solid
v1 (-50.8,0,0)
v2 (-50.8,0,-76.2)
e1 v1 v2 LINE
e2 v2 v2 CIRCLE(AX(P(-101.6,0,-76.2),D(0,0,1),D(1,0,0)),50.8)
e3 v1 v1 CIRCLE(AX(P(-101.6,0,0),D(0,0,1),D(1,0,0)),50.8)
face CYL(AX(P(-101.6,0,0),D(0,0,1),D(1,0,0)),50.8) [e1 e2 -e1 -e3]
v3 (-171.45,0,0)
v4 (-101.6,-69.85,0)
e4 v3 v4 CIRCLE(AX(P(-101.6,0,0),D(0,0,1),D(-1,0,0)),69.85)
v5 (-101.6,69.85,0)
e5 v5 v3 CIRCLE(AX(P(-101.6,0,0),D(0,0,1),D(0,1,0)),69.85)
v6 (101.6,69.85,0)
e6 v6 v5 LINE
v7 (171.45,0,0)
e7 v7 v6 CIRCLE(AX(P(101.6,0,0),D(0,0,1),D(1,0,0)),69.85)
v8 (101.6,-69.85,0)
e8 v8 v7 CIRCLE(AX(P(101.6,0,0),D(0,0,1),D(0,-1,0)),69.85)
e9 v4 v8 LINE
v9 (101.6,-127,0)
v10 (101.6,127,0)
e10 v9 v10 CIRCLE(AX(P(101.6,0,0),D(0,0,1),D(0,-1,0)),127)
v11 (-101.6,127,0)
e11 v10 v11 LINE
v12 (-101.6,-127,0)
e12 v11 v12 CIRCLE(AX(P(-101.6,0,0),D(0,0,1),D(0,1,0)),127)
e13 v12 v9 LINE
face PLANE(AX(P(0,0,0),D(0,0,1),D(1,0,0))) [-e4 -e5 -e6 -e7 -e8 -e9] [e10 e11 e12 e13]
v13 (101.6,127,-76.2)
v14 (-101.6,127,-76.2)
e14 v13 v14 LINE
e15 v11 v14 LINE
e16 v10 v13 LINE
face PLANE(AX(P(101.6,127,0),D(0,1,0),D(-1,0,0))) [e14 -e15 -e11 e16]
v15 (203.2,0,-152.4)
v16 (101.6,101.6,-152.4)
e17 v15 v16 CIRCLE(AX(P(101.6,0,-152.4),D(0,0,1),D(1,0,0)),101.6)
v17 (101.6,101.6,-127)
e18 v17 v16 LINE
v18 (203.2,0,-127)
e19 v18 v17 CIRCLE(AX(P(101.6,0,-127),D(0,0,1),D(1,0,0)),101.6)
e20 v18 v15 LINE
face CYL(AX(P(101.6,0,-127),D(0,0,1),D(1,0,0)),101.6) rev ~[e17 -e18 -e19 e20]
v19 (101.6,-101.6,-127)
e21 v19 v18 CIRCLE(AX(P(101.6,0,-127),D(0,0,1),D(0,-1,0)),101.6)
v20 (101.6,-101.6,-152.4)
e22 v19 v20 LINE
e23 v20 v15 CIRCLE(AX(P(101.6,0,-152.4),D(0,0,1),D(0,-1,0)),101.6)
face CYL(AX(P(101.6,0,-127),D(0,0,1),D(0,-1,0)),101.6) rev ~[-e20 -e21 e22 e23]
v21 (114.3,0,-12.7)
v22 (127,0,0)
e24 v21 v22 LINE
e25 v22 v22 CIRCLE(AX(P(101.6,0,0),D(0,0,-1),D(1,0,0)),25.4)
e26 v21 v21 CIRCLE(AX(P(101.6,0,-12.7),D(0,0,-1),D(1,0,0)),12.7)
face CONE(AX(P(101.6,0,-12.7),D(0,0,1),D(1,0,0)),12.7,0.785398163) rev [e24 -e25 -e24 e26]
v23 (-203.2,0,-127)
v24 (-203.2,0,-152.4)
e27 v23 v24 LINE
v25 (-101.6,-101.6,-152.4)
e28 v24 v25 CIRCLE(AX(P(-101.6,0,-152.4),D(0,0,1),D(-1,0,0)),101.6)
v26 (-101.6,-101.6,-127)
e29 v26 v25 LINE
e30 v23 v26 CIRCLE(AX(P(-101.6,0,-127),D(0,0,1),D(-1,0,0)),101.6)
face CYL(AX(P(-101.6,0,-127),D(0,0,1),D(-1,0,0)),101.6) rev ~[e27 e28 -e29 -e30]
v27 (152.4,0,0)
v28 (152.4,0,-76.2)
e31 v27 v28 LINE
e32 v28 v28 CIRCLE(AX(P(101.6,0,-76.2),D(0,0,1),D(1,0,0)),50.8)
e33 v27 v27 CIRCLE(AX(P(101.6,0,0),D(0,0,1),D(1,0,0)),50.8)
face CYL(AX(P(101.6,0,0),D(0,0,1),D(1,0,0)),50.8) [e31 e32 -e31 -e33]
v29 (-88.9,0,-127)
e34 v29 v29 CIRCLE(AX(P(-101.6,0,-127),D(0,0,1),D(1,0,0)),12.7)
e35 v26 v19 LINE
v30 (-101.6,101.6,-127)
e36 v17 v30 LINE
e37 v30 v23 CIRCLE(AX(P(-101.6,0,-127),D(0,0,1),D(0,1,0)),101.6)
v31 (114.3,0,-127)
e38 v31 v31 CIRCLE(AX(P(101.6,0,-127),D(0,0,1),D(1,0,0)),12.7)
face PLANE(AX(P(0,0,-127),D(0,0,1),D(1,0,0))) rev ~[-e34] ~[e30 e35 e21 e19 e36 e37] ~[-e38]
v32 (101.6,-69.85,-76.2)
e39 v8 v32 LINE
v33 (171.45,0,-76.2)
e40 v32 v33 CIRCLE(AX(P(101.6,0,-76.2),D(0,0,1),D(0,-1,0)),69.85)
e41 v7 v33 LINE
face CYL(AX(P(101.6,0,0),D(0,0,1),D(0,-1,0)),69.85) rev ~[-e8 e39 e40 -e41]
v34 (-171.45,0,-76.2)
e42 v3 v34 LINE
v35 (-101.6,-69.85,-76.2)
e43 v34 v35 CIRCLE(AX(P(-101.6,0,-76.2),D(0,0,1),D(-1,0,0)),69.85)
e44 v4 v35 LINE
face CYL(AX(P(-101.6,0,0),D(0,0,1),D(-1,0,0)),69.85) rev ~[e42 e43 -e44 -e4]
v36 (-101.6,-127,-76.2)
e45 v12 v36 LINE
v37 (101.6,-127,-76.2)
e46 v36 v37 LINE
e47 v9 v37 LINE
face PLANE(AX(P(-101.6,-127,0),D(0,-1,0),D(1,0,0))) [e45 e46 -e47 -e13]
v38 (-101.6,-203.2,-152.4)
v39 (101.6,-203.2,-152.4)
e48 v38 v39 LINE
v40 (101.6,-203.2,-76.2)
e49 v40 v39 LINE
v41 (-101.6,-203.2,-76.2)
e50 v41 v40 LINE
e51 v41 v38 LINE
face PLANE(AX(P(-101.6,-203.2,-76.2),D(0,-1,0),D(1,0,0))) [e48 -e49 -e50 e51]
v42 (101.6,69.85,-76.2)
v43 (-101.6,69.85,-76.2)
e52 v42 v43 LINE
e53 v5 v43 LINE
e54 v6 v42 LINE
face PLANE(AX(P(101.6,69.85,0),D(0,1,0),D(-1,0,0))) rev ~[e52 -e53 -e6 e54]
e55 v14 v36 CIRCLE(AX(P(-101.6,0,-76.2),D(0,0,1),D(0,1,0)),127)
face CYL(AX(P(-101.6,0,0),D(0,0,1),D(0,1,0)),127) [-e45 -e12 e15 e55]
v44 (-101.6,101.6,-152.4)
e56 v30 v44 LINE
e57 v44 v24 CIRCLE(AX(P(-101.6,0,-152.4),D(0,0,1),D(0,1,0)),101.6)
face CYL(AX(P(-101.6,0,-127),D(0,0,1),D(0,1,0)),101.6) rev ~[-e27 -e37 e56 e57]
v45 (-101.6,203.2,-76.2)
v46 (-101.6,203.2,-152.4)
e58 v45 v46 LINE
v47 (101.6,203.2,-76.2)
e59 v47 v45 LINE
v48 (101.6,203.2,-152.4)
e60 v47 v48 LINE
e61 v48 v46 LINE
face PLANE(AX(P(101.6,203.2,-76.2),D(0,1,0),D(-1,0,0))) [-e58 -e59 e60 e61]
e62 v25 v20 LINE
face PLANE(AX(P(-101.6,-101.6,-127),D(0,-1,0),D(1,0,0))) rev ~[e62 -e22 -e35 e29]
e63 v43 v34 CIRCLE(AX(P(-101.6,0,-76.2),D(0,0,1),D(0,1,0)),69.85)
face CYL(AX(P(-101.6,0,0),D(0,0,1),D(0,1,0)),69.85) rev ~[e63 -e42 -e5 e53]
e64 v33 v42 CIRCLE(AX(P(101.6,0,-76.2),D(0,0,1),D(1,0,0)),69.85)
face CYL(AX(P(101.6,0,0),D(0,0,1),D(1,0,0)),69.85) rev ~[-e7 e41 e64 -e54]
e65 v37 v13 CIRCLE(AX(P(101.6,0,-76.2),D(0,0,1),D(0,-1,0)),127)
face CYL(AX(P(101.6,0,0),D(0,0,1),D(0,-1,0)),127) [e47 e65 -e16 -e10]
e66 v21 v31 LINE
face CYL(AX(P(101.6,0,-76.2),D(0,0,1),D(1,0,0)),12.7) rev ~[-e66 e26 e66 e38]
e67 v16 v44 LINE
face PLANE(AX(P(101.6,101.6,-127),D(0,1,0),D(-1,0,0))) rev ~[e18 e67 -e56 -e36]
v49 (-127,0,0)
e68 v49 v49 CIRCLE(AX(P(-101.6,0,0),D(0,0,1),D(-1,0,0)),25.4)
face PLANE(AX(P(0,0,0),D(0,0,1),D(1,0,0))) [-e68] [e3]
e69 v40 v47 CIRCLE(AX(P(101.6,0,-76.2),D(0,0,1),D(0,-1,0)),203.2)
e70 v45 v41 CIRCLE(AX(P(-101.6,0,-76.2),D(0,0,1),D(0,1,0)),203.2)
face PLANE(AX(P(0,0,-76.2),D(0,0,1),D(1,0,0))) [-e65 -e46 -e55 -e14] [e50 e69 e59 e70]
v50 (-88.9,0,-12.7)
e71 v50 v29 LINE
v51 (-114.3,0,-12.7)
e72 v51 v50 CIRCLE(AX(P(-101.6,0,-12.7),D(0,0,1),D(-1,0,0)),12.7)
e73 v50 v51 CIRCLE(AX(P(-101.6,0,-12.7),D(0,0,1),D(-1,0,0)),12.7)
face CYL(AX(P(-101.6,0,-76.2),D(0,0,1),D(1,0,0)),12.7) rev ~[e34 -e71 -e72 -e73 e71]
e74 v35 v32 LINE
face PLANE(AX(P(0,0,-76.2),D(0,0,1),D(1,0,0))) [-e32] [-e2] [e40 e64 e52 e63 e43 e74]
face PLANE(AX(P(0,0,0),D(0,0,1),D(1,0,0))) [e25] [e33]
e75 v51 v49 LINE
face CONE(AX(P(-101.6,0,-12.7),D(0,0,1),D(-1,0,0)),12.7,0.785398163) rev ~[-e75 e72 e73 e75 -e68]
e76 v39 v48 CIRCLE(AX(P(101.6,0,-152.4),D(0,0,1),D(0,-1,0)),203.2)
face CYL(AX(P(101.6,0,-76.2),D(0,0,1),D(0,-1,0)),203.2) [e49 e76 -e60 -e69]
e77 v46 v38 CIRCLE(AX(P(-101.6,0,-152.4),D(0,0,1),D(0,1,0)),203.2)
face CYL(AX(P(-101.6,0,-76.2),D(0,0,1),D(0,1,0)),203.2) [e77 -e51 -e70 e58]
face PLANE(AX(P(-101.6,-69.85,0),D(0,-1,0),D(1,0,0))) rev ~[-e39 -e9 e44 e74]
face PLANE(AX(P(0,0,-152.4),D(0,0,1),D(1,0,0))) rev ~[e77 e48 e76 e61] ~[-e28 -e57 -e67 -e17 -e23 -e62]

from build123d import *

# Parameters (mm, degrees)
F0_R     = 50.8
F0_R_2   = 25.4
F0_R_3   = 12.7
F1_DEPTH = 76.2
F2_START = -76.2
F2_DEPTH = 76.2
F3_START = -127
F3_DEPTH = 25.4
F4_DEPTH = 76.2


# Not quite as in the source:
# - a pattern or mirror of a feature is missing from the dataset's text; its kind, count and spacing are read off the source's solid


with BuildPart() as f1:
    # F0 (on Top) → F1 (new body)
    with BuildSketch(Plane.XY):
        with BuildLine():
            Line((-101.6, -127), (101.6, -127))
            ThreePointArc((101.6, -127), (191.4025612107, -89.8025612107), (228.6, 0))
            ThreePointArc((228.6, 0), (191.4025612107, 89.8025612107), (101.6, 127))
            Line((101.6, 127), (-101.6, 127))
            ThreePointArc((-101.6, 127), (-191.4025612107, 89.8025612107), (-228.6, 0))
            ThreePointArc((-228.6, 0), (-191.4025612107, -89.8025612107), (-101.6, -127))
        make_face()
        with BuildLine():
            ThreePointArc((203.2, 0), (173.4420489686, -71.8420489686), (101.6, -101.6))
            Line((101.6, -101.6), (-101.6, -101.6))
            ThreePointArc((-101.6, -101.6), (-173.4420489686, -71.8420489686), (-203.2, 0))
            ThreePointArc((-203.2, 0), (-173.4420489686, 71.8420489686), (-101.6, 101.6))
            Line((-101.6, 101.6), (101.6, 101.6))
            ThreePointArc((101.6, 101.6), (173.4420489686, 71.8420489686), (203.2, 0))
        make_face(mode=Mode.SUBTRACT)
        with BuildLine():
            Line((-101.6, -101.6), (101.6, -101.6))
            ThreePointArc((101.6, -101.6), (173.4420489686, -71.8420489686), (203.2, 0))
            ThreePointArc((203.2, 0), (173.4420489686, 71.8420489686), (101.6, 101.6))
            Line((101.6, 101.6), (-101.6, 101.6))
            ThreePointArc((-101.6, 101.6), (-173.4420489686, 71.8420489686), (-203.2, 0))
            ThreePointArc((-203.2, 0), (-173.4420489686, -71.8420489686), (-101.6, -101.6))
        make_face()
        with BuildLine():
            Line((-101.6, 69.85), (101.6, 69.85))
            ThreePointArc((101.6, 69.85), (150.9914086659, 49.3914086659), (171.45, 0))
            ThreePointArc((171.45, 0), (150.9914086659, -49.3914086659), (101.6, -69.85))
            Line((101.6, -69.85), (-101.6, -69.85))
            ThreePointArc((-101.6, -69.85), (-150.9914086659, -49.3914086659), (-171.45, 0))
            ThreePointArc((-171.45, 0), (-150.9914086659, 49.3914086659), (-101.6, 69.85))
        make_face(mode=Mode.SUBTRACT)
        with BuildLine():
            ThreePointArc((171.45, 0), (150.9914086659, 49.3914086659), (101.6, 69.85))
            Line((101.6, 69.85), (-101.6, 69.85))
            ThreePointArc((-101.6, 69.85), (-150.9914086659, 49.3914086659), (-171.45, 0))
            ThreePointArc((-171.45, 0), (-150.9914086659, -49.3914086659), (-101.6, -69.85))
            Line((-101.6, -69.85), (101.6, -69.85))
            ThreePointArc((101.6, -69.85), (150.9914086659, -49.3914086659), (171.45, 0))
        make_face()
        with Locations((-101.6, 0)):
            Circle(F0_R, mode=Mode.SUBTRACT)
        with Locations((101.6, 0)):
            Circle(F0_R, mode=Mode.SUBTRACT)
        with Locations((-101.6, 0)):
            Circle(F0_R)
        with Locations((-101.6, 0)):
            Circle(F0_R_2, mode=Mode.SUBTRACT)
        with Locations((101.6, 0)):
            Circle(F0_R)
        with Locations((101.6, 0)):
            Circle(F0_R_2, mode=Mode.SUBTRACT)
        with Locations((-101.6, 0)):
            Circle(F0_R_2)
        with Locations((-101.6, 0)):
            Circle(F0_R_3, mode=Mode.SUBTRACT)
        with Locations((101.6, 0)):
            Circle(F0_R_2)
        with Locations((101.6, 0)):
            Circle(F0_R_3, mode=Mode.SUBTRACT)
    extrude(amount=-F1_DEPTH)

    # F0 (on Top) → F2 (join)
    with BuildSketch(Plane.XY.offset(F2_START)):
        with BuildLine():
            Line((-101.6, -203.2), (101.6, -203.2))
            ThreePointArc((101.6, -203.2), (245.2840979371, -143.6840979371), (304.8, 0))
            ThreePointArc((304.8, 0), (245.2840979371, 143.6840979371), (101.6, 203.2))
            Line((101.6, 203.2), (-101.6, 203.2))
            ThreePointArc((-101.6, 203.2), (-245.2840979371, 143.6840979371), (-304.8, 0))
            ThreePointArc((-304.8, 0), (-245.2840979371, -143.6840979371), (-101.6, -203.2))
        make_face()
        with BuildLine():
            ThreePointArc((228.6, 0), (191.4025612107, -89.8025612107), (101.6, -127))
            Line((101.6, -127), (-101.6, -127))
            ThreePointArc((-101.6, -127), (-191.4025612107, -89.8025612107), (-228.6, 0))
            ThreePointArc((-228.6, 0), (-191.4025612107, 89.8025612107), (-101.6, 127))
            Line((-101.6, 127), (101.6, 127))
            ThreePointArc((101.6, 127), (191.4025612107, 89.8025612107), (228.6, 0))
        make_face(mode=Mode.SUBTRACT)
        with BuildLine():
            Line((-101.6, -127), (101.6, -127))
            ThreePointArc((101.6, -127), (191.4025612107, -89.8025612107), (228.6, 0))
            ThreePointArc((228.6, 0), (191.4025612107, 89.8025612107), (101.6, 127))
            Line((101.6, 127), (-101.6, 127))
            ThreePointArc((-101.6, 127), (-191.4025612107, 89.8025612107), (-228.6, 0))
            ThreePointArc((-228.6, 0), (-191.4025612107, -89.8025612107), (-101.6, -127))
        make_face()
        with BuildLine():
            ThreePointArc((203.2, 0), (173.4420489686, -71.8420489686), (101.6, -101.6))
            Line((101.6, -101.6), (-101.6, -101.6))
            ThreePointArc((-101.6, -101.6), (-173.4420489686, -71.8420489686), (-203.2, 0))
            ThreePointArc((-203.2, 0), (-173.4420489686, 71.8420489686), (-101.6, 101.6))
            Line((-101.6, 101.6), (101.6, 101.6))
            ThreePointArc((101.6, 101.6), (173.4420489686, 71.8420489686), (203.2, 0))
        make_face(mode=Mode.SUBTRACT)
        with BuildLine():
            Line((-101.6, -101.6), (101.6, -101.6))
            ThreePointArc((101.6, -101.6), (173.4420489686, -71.8420489686), (203.2, 0))
            ThreePointArc((203.2, 0), (173.4420489686, 71.8420489686), (101.6, 101.6))
            Line((101.6, 101.6), (-101.6, 101.6))
            ThreePointArc((-101.6, 101.6), (-173.4420489686, 71.8420489686), (-203.2, 0))
            ThreePointArc((-203.2, 0), (-173.4420489686, -71.8420489686), (-101.6, -101.6))
        make_face()
        with BuildLine():
            Line((-101.6, 69.85), (101.6, 69.85))
            ThreePointArc((101.6, 69.85), (150.9914086659, 49.3914086659), (171.45, 0))
            ThreePointArc((171.45, 0), (150.9914086659, -49.3914086659), (101.6, -69.85))
            Line((101.6, -69.85), (-101.6, -69.85))
            ThreePointArc((-101.6, -69.85), (-150.9914086659, -49.3914086659), (-171.45, 0))
            ThreePointArc((-171.45, 0), (-150.9914086659, 49.3914086659), (-101.6, 69.85))
        make_face(mode=Mode.SUBTRACT)
        with BuildLine():
            ThreePointArc((171.45, 0), (150.9914086659, 49.3914086659), (101.6, 69.85))
            Line((101.6, 69.85), (-101.6, 69.85))
            ThreePointArc((-101.6, 69.85), (-150.9914086659, 49.3914086659), (-171.45, 0))
            ThreePointArc((-171.45, 0), (-150.9914086659, -49.3914086659), (-101.6, -69.85))
            Line((-101.6, -69.85), (101.6, -69.85))
            ThreePointArc((101.6, -69.85), (150.9914086659, -49.3914086659), (171.45, 0))
        make_face()
        with Locations((-101.6, 0)):
            Circle(F0_R, mode=Mode.SUBTRACT)
        with Locations((101.6, 0)):
            Circle(F0_R, mode=Mode.SUBTRACT)
        with Locations((-101.6, 0)):
            Circle(F0_R)
        with Locations((-101.6, 0)):
            Circle(F0_R_2, mode=Mode.SUBTRACT)
        with Locations((-101.6, 0)):
            Circle(F0_R_2)
        with Locations((-101.6, 0)):
            Circle(F0_R_3, mode=Mode.SUBTRACT)
        with Locations((101.6, 0)):
            Circle(F0_R)
        with Locations((101.6, 0)):
            Circle(F0_R_2, mode=Mode.SUBTRACT)
        with Locations((101.6, 0)):
            Circle(F0_R_2)
        with Locations((101.6, 0)):
            Circle(F0_R_3, mode=Mode.SUBTRACT)
    extrude(amount=-F2_DEPTH)

    # F0 (on Top) → F3 (cut)
    with BuildSketch(Plane.XY.offset(F3_START)):
        with BuildLine():
            Line((-101.6, -101.6), (101.6, -101.6))
            ThreePointArc((101.6, -101.6), (173.4420489686, -71.8420489686), (203.2, 0))
            ThreePointArc((203.2, 0), (173.4420489686, 71.8420489686), (101.6, 101.6))
            Line((101.6, 101.6), (-101.6, 101.6))
            ThreePointArc((-101.6, 101.6), (-173.4420489686, 71.8420489686), (-203.2, 0))
            ThreePointArc((-203.2, 0), (-173.4420489686, -71.8420489686), (-101.6, -101.6))
        make_face()
        with BuildLine():
            Line((-101.6, 69.85), (101.6, 69.85))
            ThreePointArc((101.6, 69.85), (150.9914086659, 49.3914086659), (171.45, 0))
            ThreePointArc((171.45, 0), (150.9914086659, -49.3914086659), (101.6, -69.85))
            Line((101.6, -69.85), (-101.6, -69.85))
            ThreePointArc((-101.6, -69.85), (-150.9914086659, -49.3914086659), (-171.45, 0))
            ThreePointArc((-171.45, 0), (-150.9914086659, 49.3914086659), (-101.6, 69.85))
        make_face(mode=Mode.SUBTRACT)
        with BuildLine():
            ThreePointArc((171.45, 0), (150.9914086659, 49.3914086659), (101.6, 69.85))
            Line((101.6, 69.85), (-101.6, 69.85))
            ThreePointArc((-101.6, 69.85), (-150.9914086659, 49.3914086659), (-171.45, 0))
            ThreePointArc((-171.45, 0), (-150.9914086659, -49.3914086659), (-101.6, -69.85))
            Line((-101.6, -69.85), (101.6, -69.85))
            ThreePointArc((101.6, -69.85), (150.9914086659, -49.3914086659), (171.45, 0))
        make_face()
        with Locations((-101.6, 0)):
            Circle(F0_R, mode=Mode.SUBTRACT)
        with Locations((101.6, 0)):
            Circle(F0_R, mode=Mode.SUBTRACT)
        with Locations((101.6, 0)):
            Circle(F0_R)
        with Locations((101.6, 0)):
            Circle(F0_R_2, mode=Mode.SUBTRACT)
        with Locations((101.6, 0)):
            Circle(F0_R_2)
        with Locations((101.6, 0)):
            Circle(F0_R_3, mode=Mode.SUBTRACT)
        with Locations((-101.6, 0)):
            Circle(F0_R)
        with Locations((-101.6, 0)):
            Circle(F0_R_2, mode=Mode.SUBTRACT)
        with Locations((-101.6, 0)):
            Circle(F0_R_2)
        with Locations((-101.6, 0)):
            Circle(F0_R_3, mode=Mode.SUBTRACT)
        with Locations((-101.6, 0)):
            Circle(F0_R_3)
        with Locations((101.6, 0)):
            Circle(F0_R_3)
    extrude(amount=-F3_DEPTH, mode=Mode.SUBTRACT)

    # F0 (on Top) → F4 (cut)
    with BuildSketch(Plane.XY):
        with BuildLine():
            ThreePointArc((171.45, 0), (150.9914086659, 49.3914086659), (101.6, 69.85))
            Line((101.6, 69.85), (-101.6, 69.85))
            ThreePointArc((-101.6, 69.85), (-150.9914086659, 49.3914086659), (-171.45, 0))
            ThreePointArc((-171.45, 0), (-150.9914086659, -49.3914086659), (-101.6, -69.85))
            Line((-101.6, -69.85), (101.6, -69.85))
            ThreePointArc((101.6, -69.85), (150.9914086659, -49.3914086659), (171.45, 0))
        make_face()
        with Locations((-101.6, 0)):
            Circle(F0_R, mode=Mode.SUBTRACT)
        with Locations((101.6, 0)):
            Circle(F0_R, mode=Mode.SUBTRACT)
    extrude(amount=-F4_DEPTH, mode=Mode.SUBTRACT)

    # F5 (on Front) → F6 (revolve, cut)
    with BuildSketch(Plane.XZ):
        Polygon((127, 0), (101.6, 0), (101.6, -12.7), (114.3, -12.7), align=None)
    f6 = revolve(axis=Axis((101.6, 0, -6.35), (0, 0, -1)), mode=Mode.SUBTRACT)

    # F6_copies: F6 across plane
    add(f6.mirror(Plane(origin=(0, 0, 0), x_dir=(0, 0, -1), z_dir=(-1, 0, 0))), mode=Mode.SUBTRACT)


solid = f1.part
